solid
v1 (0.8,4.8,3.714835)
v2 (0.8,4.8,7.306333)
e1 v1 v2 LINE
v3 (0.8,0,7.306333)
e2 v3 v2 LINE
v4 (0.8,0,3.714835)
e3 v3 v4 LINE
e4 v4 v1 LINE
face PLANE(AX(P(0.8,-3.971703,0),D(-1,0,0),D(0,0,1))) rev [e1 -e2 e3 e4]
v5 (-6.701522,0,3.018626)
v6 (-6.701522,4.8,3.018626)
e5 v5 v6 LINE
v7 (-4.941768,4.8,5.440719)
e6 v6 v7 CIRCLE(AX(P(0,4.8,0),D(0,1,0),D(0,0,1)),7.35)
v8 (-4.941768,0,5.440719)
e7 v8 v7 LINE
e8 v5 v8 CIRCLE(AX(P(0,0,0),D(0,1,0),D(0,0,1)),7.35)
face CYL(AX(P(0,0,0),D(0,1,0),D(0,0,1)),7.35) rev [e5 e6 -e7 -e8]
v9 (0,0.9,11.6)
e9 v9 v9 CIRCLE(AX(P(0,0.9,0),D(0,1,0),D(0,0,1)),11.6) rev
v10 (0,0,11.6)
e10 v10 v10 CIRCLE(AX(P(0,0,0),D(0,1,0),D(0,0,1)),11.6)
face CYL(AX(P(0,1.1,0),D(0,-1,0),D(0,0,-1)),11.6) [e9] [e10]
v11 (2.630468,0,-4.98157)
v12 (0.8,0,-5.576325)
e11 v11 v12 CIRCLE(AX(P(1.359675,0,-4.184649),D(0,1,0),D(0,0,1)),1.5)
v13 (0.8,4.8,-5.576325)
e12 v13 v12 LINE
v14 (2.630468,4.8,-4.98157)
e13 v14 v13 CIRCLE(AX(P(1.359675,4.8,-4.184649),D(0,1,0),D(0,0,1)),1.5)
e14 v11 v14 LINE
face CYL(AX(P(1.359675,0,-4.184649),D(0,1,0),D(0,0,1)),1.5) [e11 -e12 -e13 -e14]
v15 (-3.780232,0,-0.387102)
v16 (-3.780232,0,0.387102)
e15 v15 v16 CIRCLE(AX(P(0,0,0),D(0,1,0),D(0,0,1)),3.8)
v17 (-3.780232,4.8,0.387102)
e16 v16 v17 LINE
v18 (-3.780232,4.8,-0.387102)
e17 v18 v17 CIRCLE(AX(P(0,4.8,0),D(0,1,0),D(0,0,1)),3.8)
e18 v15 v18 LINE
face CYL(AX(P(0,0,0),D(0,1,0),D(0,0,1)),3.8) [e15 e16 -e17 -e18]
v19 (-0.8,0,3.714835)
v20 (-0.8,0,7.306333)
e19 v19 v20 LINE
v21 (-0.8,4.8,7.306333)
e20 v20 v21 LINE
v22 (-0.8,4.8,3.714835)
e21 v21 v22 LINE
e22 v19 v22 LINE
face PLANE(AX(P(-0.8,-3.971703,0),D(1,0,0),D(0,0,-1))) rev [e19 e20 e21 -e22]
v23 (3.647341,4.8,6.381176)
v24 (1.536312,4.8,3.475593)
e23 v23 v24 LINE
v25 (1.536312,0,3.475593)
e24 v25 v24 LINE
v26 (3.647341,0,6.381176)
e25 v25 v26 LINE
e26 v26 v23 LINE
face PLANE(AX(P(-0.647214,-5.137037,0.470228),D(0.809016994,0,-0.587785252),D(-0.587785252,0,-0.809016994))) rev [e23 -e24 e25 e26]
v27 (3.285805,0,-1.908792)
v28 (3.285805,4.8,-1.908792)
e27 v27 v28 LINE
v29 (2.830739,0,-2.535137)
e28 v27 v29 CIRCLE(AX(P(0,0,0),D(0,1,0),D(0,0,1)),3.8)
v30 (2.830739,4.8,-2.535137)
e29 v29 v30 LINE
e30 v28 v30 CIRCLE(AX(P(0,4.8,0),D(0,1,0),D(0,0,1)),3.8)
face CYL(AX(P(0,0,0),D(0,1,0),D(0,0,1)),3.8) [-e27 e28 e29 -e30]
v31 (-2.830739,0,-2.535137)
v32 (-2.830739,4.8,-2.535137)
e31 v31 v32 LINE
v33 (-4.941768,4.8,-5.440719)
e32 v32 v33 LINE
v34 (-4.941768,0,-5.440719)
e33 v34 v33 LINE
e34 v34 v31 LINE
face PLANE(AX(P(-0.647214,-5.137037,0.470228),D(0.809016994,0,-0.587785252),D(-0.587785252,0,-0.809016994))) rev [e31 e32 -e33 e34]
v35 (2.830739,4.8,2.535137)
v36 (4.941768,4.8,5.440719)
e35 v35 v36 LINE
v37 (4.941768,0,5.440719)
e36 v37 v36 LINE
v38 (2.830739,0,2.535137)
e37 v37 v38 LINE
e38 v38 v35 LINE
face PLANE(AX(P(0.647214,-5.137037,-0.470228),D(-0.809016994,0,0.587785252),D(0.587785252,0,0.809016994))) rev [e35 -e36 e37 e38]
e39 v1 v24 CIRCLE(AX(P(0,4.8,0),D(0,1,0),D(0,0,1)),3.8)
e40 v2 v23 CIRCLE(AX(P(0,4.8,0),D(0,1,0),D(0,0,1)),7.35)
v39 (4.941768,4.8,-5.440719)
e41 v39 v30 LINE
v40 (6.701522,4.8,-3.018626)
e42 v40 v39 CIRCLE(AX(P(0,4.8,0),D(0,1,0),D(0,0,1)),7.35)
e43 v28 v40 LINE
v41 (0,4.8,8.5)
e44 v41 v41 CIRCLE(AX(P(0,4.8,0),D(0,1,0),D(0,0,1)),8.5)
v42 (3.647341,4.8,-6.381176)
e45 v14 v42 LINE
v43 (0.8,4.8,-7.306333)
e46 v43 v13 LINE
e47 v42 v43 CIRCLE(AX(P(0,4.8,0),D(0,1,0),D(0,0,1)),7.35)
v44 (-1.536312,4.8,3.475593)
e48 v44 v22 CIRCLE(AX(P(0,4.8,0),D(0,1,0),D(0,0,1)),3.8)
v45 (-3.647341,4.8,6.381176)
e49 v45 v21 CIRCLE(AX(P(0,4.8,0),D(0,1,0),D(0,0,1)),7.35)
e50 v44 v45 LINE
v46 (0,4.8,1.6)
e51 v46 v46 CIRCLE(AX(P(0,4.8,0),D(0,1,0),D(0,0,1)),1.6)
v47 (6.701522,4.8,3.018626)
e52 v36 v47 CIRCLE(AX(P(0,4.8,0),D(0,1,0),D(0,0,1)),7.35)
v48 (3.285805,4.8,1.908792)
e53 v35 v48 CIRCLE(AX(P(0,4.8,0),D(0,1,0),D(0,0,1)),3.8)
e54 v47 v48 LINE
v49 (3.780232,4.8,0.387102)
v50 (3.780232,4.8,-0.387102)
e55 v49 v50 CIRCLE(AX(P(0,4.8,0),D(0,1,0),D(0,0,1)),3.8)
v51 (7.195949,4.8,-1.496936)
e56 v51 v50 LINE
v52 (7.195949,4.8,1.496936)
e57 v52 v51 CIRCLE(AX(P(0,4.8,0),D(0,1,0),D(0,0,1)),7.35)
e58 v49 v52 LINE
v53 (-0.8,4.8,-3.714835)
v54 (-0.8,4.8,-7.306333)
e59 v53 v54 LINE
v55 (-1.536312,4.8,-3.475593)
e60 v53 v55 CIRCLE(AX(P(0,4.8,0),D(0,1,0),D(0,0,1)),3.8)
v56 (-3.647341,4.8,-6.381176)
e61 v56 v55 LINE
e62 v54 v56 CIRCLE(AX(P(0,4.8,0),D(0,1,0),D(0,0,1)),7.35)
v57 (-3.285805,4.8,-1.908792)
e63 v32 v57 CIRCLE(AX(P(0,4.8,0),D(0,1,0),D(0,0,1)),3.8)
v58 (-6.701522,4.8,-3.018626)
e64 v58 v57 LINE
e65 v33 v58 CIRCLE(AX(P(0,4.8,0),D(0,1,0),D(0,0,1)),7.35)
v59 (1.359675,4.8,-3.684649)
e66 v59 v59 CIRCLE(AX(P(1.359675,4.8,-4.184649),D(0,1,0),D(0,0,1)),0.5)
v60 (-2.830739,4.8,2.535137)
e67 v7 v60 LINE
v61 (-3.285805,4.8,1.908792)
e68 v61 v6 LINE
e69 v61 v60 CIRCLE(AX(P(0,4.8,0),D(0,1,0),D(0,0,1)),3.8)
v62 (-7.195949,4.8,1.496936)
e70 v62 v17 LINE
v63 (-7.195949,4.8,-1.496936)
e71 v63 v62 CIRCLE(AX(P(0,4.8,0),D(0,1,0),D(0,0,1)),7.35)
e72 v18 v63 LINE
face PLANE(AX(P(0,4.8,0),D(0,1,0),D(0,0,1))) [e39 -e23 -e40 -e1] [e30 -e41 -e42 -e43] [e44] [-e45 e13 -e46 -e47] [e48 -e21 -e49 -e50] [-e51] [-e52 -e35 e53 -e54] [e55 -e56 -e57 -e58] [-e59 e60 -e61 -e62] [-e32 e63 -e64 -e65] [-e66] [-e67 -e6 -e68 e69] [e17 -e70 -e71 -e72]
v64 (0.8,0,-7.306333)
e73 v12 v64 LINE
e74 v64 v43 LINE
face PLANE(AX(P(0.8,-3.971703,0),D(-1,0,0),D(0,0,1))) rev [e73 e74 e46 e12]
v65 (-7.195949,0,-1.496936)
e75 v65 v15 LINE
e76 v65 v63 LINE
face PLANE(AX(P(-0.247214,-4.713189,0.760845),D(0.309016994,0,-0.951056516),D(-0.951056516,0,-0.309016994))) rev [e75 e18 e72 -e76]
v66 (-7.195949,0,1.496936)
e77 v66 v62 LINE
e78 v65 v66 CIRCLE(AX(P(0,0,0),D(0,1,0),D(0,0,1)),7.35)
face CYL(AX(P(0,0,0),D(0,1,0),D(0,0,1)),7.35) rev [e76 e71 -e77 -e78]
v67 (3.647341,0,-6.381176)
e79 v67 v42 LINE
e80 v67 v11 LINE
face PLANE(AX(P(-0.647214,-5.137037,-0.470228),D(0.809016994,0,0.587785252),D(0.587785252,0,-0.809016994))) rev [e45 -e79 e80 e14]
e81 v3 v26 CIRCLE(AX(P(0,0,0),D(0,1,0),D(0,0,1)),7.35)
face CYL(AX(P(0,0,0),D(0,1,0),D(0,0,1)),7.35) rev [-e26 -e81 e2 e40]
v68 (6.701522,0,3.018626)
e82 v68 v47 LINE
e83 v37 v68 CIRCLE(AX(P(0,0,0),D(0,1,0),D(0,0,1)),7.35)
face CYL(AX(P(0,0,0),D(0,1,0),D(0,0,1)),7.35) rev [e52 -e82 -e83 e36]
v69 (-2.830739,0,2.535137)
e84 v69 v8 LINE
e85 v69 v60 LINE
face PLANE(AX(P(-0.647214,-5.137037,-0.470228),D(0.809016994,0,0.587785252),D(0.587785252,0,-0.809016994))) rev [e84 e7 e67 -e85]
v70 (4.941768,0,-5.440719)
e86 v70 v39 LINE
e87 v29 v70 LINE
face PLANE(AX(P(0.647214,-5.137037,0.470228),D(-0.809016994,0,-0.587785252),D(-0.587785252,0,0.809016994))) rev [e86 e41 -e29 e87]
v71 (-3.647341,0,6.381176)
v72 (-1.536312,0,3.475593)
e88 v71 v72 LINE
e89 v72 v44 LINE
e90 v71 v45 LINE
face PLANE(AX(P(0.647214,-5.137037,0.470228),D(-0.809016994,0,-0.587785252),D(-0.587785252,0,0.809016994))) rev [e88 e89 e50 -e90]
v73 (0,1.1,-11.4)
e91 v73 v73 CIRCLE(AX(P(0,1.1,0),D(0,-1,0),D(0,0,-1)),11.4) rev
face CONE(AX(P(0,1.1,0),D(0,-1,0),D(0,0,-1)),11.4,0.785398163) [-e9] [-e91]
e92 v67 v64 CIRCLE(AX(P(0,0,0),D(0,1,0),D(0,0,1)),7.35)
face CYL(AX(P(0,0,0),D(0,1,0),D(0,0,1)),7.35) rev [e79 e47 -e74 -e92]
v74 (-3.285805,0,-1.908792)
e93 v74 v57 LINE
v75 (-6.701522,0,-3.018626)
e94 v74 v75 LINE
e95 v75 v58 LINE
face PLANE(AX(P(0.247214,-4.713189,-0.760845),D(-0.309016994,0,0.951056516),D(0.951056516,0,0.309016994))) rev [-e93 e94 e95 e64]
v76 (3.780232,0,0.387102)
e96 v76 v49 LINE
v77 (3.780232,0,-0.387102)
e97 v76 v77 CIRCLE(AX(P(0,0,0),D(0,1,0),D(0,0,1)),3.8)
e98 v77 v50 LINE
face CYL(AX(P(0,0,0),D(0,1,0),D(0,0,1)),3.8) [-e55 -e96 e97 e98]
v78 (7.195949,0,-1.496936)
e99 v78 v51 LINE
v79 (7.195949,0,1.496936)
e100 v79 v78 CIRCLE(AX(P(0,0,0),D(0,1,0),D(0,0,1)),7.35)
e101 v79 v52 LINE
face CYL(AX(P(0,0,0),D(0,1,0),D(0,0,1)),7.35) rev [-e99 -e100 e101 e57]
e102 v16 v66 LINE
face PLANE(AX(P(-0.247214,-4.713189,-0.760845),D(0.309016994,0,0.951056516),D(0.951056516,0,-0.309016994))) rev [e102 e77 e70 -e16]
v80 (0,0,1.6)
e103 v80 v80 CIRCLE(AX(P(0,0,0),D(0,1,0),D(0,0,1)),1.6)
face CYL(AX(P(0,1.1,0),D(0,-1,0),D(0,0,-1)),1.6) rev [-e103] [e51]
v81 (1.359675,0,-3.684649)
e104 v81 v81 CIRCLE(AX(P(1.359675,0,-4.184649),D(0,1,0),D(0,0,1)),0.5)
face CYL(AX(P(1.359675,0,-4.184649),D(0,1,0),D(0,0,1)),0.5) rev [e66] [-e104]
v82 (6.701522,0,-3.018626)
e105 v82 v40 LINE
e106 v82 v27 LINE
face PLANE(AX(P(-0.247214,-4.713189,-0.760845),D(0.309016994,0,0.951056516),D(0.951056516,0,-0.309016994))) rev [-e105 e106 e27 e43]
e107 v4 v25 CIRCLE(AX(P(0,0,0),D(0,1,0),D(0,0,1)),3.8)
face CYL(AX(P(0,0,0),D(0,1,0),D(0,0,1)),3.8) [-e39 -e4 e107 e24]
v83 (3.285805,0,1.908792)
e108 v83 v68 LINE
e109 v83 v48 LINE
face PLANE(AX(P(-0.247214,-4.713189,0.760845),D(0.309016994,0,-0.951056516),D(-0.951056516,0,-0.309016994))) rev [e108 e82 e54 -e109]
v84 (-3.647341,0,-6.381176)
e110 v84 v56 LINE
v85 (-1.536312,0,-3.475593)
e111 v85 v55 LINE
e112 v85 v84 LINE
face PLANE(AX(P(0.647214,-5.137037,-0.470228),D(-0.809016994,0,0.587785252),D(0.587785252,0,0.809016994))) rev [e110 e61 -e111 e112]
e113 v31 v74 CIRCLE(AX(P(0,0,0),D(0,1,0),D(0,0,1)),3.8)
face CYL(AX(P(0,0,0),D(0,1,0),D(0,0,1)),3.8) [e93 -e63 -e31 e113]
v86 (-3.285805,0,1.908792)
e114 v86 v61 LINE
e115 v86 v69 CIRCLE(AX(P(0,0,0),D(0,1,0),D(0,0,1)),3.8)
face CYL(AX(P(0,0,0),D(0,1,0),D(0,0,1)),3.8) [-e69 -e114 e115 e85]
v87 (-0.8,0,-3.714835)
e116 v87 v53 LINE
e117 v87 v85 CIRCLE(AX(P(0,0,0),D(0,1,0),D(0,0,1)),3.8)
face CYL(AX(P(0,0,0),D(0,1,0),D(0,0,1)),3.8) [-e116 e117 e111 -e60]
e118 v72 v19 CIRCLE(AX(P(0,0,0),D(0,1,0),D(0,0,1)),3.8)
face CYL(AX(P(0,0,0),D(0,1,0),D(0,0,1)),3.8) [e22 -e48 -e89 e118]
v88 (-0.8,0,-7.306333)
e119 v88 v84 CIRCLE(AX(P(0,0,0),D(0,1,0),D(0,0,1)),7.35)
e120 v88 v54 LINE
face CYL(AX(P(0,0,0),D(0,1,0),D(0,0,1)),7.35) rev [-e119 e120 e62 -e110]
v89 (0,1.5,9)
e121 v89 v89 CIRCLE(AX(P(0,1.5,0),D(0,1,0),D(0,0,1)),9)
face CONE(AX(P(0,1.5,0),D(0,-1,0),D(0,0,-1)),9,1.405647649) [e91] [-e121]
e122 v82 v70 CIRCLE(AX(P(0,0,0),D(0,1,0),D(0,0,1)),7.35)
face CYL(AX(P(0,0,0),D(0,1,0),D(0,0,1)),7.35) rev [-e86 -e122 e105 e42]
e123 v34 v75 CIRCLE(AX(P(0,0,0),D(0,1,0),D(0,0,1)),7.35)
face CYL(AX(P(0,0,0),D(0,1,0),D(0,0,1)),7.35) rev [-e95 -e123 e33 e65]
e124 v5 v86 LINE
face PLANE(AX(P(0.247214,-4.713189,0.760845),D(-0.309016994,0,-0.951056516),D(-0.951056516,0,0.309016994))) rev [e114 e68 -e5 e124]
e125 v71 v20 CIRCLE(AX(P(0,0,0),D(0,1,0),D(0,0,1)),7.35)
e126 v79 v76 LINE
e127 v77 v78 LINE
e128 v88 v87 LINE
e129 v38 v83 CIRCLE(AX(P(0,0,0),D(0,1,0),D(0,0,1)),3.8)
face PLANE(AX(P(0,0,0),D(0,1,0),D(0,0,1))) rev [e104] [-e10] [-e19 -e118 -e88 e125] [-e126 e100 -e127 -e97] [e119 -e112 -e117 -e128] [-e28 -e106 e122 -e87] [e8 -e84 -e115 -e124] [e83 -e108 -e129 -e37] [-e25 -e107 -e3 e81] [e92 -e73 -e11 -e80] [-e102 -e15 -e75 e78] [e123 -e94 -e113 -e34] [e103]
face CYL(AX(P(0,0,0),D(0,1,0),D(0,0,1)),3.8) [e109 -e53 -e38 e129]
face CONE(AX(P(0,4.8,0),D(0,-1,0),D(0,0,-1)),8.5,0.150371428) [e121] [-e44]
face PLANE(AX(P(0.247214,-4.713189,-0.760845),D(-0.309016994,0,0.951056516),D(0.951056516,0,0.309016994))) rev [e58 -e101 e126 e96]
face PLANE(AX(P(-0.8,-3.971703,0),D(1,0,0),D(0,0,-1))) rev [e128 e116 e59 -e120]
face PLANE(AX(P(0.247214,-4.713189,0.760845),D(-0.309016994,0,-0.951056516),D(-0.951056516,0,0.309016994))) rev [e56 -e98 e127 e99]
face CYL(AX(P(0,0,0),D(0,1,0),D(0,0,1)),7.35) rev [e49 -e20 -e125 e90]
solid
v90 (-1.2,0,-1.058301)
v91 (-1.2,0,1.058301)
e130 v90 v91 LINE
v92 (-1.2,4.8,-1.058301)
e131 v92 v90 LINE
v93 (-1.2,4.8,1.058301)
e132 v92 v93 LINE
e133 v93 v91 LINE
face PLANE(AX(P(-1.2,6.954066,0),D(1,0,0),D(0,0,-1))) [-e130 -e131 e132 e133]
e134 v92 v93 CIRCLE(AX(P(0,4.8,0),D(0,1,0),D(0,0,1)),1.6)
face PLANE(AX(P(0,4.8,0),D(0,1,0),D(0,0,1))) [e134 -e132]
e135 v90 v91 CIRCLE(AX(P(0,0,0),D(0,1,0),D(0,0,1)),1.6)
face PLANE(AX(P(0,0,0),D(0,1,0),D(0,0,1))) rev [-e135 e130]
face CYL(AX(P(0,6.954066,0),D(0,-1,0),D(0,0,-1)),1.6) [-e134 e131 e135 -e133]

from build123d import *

# Parameters (mm, degrees)
SKETCH_4_R               = 11.6
SKETCH_4_R_2             = 1.6
EXTRUDE_1_DEPTH          = 1.1
EXTRUDE_START            = 1.5
SKETCH_4_3_R             = 9
SKETCH_4_3_R_2           = 1.6
EXTRUDE_2_DEPTH          = 3.3
CHAMFER_1_SIZE           = 0.2
SKETCH_4_4_R             = 1.6
CUT_EXTRUDE_2_DEPTH      = 18.092688495
CHAMFER_2_SIZE           = 0.5
CHAMFER_2_SIZE_2         = 3.3
CUT_EXTRUDE_4_DEPTH      = 18.092688495
EXTRUDE_3_DEPTH          = 4.8
PATTERN_CIRCULAR_2_COUNT = 10
SKETCH_6_R               = 1.5
EXTRUDE_4_DEPTH          = 4.8
SKETCH_6_3_R             = 0.5
CUT_EXTRUDE_5_DEPTH      = 18.092688495
EXTRUDE_5_DEPTH          = 4.8


with BuildPart() as part:
    # 草图4 → 凸台-拉伸1 (new body)
    with BuildSketch(Plane(origin=(0, 0, 0), x_dir=(1, 0, 0), z_dir=(0, 1, 0))):
        with Locations(Location((0, 0, 0), (0, 0, 270))):
            Circle(SKETCH_4_R)
        with Locations(Location((0, 0, 0), (0, 0, 270))):
            Circle(SKETCH_4_R_2, mode=Mode.SUBTRACT)
    extrude(amount=EXTRUDE_1_DEPTH)

    # 倒角1
    chamfer_1_edges = [part.edges().sort_by_distance(p)[0] for p in [
        (0, 1.1, -11.6),
    ]]
    chamfer(chamfer_1_edges, length=CHAMFER_1_SIZE)


with BuildPart() as body_2:
    # 草图4<3> → 凸台-拉伸2 (new body)
    with BuildSketch(Plane(origin=(0, 0, 0), x_dir=(1, 0, 0), z_dir=(0, 1, 0)).offset(EXTRUDE_START)):
        with Locations(Location((0, 0, 0), (0, 0, 270))):
            Circle(SKETCH_4_3_R)
        with Locations(Location((0, 0, 0), (0, 0, 270))):
            Circle(SKETCH_4_3_R_2, mode=Mode.SUBTRACT)
    extrude(amount=EXTRUDE_2_DEPTH)


    add(part.part)  # loft_1 joins it to this body
    # loft up to a face of the part (loft_1)
    loft([Face(Wire([body_2.edges().sort_by_distance((-6.560717647, 1.5, -6.160923953))[0]])), Face(Wire([body_2.edges().sort_by_distance((8.310242353, 1.1, -7.803837008))[0]]))])

    # 草图4<4> → 切除-拉伸2 (cut, through all)
    with BuildSketch(Plane(origin=(0, 0, 0), x_dir=(1, 0, 0), z_dir=(0, 1, 0))):
        with Locations(Location((0, 0, 0), (0, 0, 270))):
            Circle(SKETCH_4_4_R)
    extrude(amount=CUT_EXTRUDE_2_DEPTH, mode=Mode.SUBTRACT)

    # 倒角2
    # the kernel refuses this chamfer: 3.3, 0.5 mm, written as the material it takes off along each edge
    with BuildSketch(Plane(origin=(0, 4.8, 0), x_dir=(0, 0, 1), z_dir=(-1, 0, 0))) as chamfer_2_piece_1:
        Polygon((9 - CHAMFER_2_SIZE, 0), (9, -CHAMFER_2_SIZE_2), (9, 0), align=None)
    revolve(axis=Axis((0, 4.8, 0), (0, 1, 0)), mode=Mode.SUBTRACT)

    # 草图5 → 切除-拉伸4 (cut, through all)
    with BuildSketch(Plane(origin=(0, 4.8, 0), x_dir=(1, 0, 0), z_dir=(0, 1, 0))):
        with BuildLine():
            ThreePointArc((3.8, 0), (-2.387467277, -2.9563491), (-0.8, 3.714835124))
            Line((-0.8, 3.714835124), (-0.8, 7.30633287))
            ThreePointArc((-0.8, 7.30633287), (-4.906246019, -5.47277352), (7.35, 0))
            ThreePointArc((7.35, 0), (5.47277352, 4.906246019), (0.8, 7.30633287))
            Line((0.8, 7.30633287), (0.8, 3.714835124))
            ThreePointArc((0.8, 3.714835124), (2.9563491, 2.387467277), (3.8, 0))
        make_face()
        with BuildLine():
            Line((-0.8, 7.30633287), (-0.8, 3.714835124))
            ThreePointArc((-0.8, 3.714835124), (-0.402260194, 3.778648798), (0, 3.8))
            Line((0, 3.8), (0, 7.35))
            ThreePointArc((0, 7.35), (-0.400595438, 7.339075098), (-0.8, 7.30633287))
        make_face()
        with BuildLine():
            Line((0, 7.35), (0, 3.8))
            ThreePointArc((0, 3.8), (0.402260194, 3.778648798), (0.8, 3.714835124))
            Line((0.8, 3.714835124), (0.8, 7.30633287))
            ThreePointArc((0.8, 7.30633287), (0.400595438, 7.339075098), (0, 7.35))
        make_face()
    extrude(amount=-CUT_EXTRUDE_4_DEPTH, mode=Mode.SUBTRACT)


with BuildPart() as cut_extrude_4_piece_1:
    # of the separate pieces the step leaves, piece 1, a body of its own (cut_extrude_4_pieces)
    add(body_2.part.solids().sort_by_distance((0, 0.9, 11.6))[0])

    # 草图5<4> → 凸台-拉伸3 (add)
    with BuildSketch(Plane(origin=(0, 4.8, 0), x_dir=(1, 0, 0), z_dir=(0, 1, 0))):
        with BuildLine():
            Line((0, 7.35), (0, 3.8))
            ThreePointArc((0, 3.8), (0.402260194, 3.778648798), (0.8, 3.714835124))
            Line((0.8, 3.714835124), (0.8, 7.30633287))
            ThreePointArc((0.8, 7.30633287), (0.400595438, 7.339075098), (0, 7.35))
        make_face()
        with BuildLine():
            Line((-0.8, 7.30633287), (-0.8, 3.714835124))
            ThreePointArc((-0.8, 3.714835124), (-0.402260194, 3.778648798), (0, 3.8))
            Line((0, 3.8), (0, 7.35))
            ThreePointArc((0, 7.35), (-0.400595438, 7.339075098), (-0.8, 7.30633287))
        make_face()
    extrude_3 = extrude(amount=-EXTRUDE_3_DEPTH)

    # 阵列(圆周)2: 凸台-拉伸3 ×10 about axis
    pattern_circular_2_axis = Axis((0, 0, 0), (0, 1, 0))
    for i in range(1, PATTERN_CIRCULAR_2_COUNT):
        add(extrude_3.rotate(pattern_circular_2_axis, i * 360 / PATTERN_CIRCULAR_2_COUNT))



with BuildPart() as cut_extrude_4_piece_2:
    # of the separate pieces the step leaves, piece 2, a body of its own (cut_extrude_4_pieces)
    add(body_2.part.solids().sort_by_distance((-0.8, 0, -3.714835124))[0])


with BuildPart() as cut_extrude_4_piece_1_1:
    add(cut_extrude_4_piece_1.part)

    add(cut_extrude_4_piece_2.part)  # 凸台-拉伸4 merges 切除-拉伸4 piece 2
    # 草图6 → 凸台-拉伸4 (add, through all)
    with BuildSketch(Plane(origin=(0, 4.8, 0), x_dir=(1, 0, 0), z_dir=(0, 1, 0))):
        with Locations((1.359674775, 4.184648672)):
            Circle(SKETCH_6_R)
    extrude(amount=-EXTRUDE_4_DEPTH)

    # 草图6<3> → 切除-拉伸5 (cut, through all)
    with BuildSketch(Plane(origin=(0, 4.8, 0), x_dir=(1, 0, 0), z_dir=(0, 1, 0))):
        with Locations(Location((1.359674775, 4.184648672, 0), (0, 0, 270))):
            Circle(SKETCH_6_3_R)
    extrude(amount=-CUT_EXTRUDE_5_DEPTH, mode=Mode.SUBTRACT)


with BuildPart() as body_2_2:
    # 草图4<6> → 凸台-拉伸5 (new body)
    with BuildSketch(Plane(origin=(0, 0, 0), x_dir=(1, 0, 0), z_dir=(0, 1, 0))):
        with BuildLine():
            Line((-1.2, -1.058300524), (-1.2, 1.058300524))
            ThreePointArc((-1.2, 1.058300524), (-1.6, 0), (-1.2, -1.058300524))
        make_face()
    extrude(amount=EXTRUDE_5_DEPTH)


solid = Compound([cut_extrude_4_piece_1_1.part, body_2_2.part])
